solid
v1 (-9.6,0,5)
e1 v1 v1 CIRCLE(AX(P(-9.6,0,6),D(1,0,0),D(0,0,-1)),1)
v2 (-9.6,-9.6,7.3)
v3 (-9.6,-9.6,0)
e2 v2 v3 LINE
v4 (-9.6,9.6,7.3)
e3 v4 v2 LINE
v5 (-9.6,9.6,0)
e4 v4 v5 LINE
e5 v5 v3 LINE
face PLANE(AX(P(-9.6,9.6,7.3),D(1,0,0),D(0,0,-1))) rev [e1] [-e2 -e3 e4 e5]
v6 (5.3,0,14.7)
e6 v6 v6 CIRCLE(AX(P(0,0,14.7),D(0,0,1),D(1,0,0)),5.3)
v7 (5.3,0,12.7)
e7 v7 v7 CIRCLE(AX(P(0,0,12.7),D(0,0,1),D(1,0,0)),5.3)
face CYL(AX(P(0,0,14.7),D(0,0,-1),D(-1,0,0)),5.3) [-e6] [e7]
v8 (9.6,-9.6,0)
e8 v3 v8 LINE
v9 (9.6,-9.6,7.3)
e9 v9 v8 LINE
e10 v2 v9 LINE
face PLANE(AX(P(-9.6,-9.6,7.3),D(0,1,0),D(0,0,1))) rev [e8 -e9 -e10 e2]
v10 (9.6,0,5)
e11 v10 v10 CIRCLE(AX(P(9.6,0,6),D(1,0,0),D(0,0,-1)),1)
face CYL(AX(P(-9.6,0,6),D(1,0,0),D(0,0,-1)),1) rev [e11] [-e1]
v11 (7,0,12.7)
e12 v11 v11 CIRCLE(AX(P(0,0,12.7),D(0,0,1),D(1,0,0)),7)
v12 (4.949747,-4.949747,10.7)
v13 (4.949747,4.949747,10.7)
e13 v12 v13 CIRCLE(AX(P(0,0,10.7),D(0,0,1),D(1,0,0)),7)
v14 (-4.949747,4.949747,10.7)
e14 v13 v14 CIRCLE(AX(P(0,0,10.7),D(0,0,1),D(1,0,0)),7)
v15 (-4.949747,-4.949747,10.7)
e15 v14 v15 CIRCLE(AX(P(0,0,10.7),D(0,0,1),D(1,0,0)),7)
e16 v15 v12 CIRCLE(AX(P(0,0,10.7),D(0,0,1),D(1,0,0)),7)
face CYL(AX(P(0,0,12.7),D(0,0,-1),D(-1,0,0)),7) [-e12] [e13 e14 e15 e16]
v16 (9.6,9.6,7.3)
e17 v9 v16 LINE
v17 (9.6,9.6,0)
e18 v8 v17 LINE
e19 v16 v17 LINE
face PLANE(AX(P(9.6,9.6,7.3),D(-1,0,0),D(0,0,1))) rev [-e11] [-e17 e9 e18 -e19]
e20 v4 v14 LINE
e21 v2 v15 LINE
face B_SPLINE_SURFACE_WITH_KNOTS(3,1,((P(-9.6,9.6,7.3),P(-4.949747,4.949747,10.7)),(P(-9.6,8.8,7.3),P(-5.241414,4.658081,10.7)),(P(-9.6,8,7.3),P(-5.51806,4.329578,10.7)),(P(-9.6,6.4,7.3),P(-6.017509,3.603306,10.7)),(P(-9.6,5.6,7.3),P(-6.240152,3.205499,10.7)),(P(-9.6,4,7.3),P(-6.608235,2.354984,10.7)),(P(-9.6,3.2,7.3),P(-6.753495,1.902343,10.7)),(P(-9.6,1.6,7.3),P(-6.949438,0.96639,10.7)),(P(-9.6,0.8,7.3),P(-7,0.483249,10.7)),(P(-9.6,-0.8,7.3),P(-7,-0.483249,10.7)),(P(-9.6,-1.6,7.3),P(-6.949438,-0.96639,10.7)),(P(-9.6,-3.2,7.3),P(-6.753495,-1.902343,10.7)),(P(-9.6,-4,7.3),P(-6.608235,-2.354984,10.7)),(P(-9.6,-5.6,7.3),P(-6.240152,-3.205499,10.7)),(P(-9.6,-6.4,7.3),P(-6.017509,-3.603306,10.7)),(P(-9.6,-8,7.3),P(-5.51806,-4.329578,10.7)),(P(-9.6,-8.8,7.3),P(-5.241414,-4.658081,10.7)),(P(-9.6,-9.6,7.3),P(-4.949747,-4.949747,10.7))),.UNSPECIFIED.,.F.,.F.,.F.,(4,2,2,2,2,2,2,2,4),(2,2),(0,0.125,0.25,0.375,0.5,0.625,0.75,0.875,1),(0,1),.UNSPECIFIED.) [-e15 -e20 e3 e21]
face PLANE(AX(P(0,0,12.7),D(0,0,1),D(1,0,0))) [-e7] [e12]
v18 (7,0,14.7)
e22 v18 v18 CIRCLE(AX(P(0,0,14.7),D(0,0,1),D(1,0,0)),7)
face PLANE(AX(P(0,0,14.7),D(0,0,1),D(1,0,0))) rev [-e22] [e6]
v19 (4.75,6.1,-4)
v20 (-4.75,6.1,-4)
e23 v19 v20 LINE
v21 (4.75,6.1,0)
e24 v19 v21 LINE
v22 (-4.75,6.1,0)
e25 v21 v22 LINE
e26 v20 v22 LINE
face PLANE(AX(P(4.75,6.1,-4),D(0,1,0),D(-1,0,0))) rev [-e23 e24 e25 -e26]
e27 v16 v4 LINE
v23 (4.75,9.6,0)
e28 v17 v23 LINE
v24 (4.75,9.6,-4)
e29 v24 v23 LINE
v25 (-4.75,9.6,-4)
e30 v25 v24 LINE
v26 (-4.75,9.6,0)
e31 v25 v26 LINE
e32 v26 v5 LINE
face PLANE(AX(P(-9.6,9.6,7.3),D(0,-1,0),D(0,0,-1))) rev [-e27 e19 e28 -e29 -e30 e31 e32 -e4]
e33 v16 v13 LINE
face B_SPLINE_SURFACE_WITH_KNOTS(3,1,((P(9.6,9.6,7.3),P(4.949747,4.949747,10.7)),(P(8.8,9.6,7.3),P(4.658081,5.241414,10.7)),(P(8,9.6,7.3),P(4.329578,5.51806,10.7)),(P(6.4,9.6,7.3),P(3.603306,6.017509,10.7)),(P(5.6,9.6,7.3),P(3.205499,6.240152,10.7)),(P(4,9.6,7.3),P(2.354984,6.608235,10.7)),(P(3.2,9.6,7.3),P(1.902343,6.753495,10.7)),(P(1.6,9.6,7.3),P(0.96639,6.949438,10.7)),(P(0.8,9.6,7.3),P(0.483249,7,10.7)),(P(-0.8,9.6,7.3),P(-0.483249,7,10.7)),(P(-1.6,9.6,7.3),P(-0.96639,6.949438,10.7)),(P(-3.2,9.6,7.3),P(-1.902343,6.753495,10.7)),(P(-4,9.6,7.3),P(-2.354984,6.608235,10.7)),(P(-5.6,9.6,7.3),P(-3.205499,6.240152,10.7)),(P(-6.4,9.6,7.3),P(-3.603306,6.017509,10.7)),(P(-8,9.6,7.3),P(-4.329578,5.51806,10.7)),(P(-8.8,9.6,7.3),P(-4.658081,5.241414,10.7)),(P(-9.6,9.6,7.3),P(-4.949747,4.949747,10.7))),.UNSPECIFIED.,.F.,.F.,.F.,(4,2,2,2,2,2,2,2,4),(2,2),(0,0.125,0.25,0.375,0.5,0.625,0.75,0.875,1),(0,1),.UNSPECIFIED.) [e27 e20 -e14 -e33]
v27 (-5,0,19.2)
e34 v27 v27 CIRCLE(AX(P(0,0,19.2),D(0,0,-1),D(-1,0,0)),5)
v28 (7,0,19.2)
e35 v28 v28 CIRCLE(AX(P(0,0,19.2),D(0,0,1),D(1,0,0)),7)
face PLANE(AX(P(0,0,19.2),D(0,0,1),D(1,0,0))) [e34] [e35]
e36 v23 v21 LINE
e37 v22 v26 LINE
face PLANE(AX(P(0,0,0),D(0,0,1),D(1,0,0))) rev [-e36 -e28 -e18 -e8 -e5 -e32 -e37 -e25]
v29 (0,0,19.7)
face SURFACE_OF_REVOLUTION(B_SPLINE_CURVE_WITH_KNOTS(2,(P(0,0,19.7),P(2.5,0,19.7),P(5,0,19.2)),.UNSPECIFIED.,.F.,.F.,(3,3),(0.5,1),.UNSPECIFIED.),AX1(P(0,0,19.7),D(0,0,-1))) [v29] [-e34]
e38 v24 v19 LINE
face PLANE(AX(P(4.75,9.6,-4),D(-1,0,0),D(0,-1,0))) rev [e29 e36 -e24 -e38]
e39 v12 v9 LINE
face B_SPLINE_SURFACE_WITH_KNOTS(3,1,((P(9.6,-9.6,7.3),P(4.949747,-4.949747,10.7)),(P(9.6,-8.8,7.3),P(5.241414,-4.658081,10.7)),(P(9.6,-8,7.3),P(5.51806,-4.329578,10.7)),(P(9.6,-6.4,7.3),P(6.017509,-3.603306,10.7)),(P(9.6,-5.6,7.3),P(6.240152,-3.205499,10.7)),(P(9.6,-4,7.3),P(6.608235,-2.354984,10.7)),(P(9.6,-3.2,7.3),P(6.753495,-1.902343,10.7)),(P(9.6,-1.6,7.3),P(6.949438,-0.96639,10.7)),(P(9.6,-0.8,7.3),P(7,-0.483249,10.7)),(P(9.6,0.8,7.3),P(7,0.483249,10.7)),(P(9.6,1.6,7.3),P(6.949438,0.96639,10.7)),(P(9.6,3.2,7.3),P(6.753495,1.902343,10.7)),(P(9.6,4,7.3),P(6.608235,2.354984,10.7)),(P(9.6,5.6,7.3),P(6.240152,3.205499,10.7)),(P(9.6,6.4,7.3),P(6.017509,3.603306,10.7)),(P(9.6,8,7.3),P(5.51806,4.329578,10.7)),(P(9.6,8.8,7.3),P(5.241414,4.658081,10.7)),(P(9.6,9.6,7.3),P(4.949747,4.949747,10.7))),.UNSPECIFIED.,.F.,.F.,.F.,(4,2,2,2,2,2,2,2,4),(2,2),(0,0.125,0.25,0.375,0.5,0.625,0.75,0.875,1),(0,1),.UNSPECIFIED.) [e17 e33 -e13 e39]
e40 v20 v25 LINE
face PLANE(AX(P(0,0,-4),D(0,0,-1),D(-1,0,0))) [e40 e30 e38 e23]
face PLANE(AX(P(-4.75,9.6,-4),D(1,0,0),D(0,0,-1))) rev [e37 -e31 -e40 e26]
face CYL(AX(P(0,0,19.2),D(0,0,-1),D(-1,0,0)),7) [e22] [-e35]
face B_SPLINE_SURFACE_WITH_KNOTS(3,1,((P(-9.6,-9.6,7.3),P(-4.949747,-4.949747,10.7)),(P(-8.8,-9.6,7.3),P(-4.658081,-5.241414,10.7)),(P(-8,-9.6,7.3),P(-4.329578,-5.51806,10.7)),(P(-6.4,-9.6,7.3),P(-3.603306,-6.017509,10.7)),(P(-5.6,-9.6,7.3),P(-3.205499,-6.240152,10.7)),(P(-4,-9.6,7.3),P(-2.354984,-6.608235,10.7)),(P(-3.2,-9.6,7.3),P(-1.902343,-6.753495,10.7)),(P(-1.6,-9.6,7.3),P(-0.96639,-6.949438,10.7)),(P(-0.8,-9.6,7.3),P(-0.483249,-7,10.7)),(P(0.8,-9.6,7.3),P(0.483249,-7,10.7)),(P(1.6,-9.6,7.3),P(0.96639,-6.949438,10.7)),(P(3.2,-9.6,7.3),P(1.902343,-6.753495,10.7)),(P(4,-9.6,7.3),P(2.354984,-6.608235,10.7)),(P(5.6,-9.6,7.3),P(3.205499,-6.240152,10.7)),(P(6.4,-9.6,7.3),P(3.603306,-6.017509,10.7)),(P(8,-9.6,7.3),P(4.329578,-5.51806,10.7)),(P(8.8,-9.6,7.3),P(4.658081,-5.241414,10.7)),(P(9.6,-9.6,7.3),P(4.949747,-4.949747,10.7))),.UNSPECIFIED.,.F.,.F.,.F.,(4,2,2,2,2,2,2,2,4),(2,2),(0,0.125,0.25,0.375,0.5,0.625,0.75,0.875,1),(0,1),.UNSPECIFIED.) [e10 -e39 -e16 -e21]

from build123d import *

# Parameters (mm, degrees)
SKETCH1_W           = 19.2
SKETCH1_H           = 19.2
BOSS_EXTRUDE1_DEPTH = 7.3
BOSS_EXTRUDE2_DEPTH = 2
SKETCH4_R           = 5.3
BOSS_EXTRUDE3_DEPTH = 2
SKETCH5_R           = 7
BOSS_EXTRUDE4_DEPTH = 4.5
SKETCH7_R           = 1
CUT_EXTRUDE1_DEPTH  = 19.2
SKETCH8_W           = 9.5
SKETCH8_H           = 3.5
BOSS_EXTRUDE5_DEPTH = 4


with BuildPart() as part:
    # Sketch1 → Boss-Extrude1 (new body)
    with BuildSketch(Plane.XY):
        Rectangle(SKETCH1_W, SKETCH1_H)
    extrude(amount=BOSS_EXTRUDE1_DEPTH)

    # Loft1: read off the stored shape, not the designer's step
    # Loft1: loft between two sections, ruled curve by curve
    loft1_from = [
        Edge.make_bspline([(9.6, -9.6, 7.3), (9.6, -8.8, 7.3), (9.6, -8, 7.3), (9.6, -6.4, 7.3), (9.6, -5.6, 7.3), (9.6, -4, 7.3), (9.6, -3.2, 7.3), (9.6, -1.6, 7.3), (9.6, -0.8, 7.3), (9.6, 0.8, 7.3), (9.6, 1.6, 7.3), (9.6, 3.2, 7.3), (9.6, 4, 7.3), (9.6, 5.6, 7.3), (9.6, 6.4, 7.3), (9.6, 8, 7.3), (9.6, 8.8, 7.3), (9.6, 9.6, 7.3)], [0, 0, 0, 0, 0.125, 0.125, 0.25, 0.25, 0.375, 0.375, 0.5, 0.5, 0.625, 0.625, 0.75, 0.75, 0.875, 0.875, 1, 1, 1, 1], 3),
        Edge.make_bspline([(9.6, 9.6, 7.3), (8.8, 9.6, 7.3), (8, 9.6, 7.3), (6.4, 9.6, 7.3), (5.6, 9.6, 7.3), (4, 9.6, 7.3), (3.2, 9.6, 7.3), (1.6, 9.6, 7.3), (0.8, 9.6, 7.3), (-0.8, 9.6, 7.3), (-1.6, 9.6, 7.3), (-3.2, 9.6, 7.3), (-4, 9.6, 7.3), (-5.6, 9.6, 7.3), (-6.4, 9.6, 7.3), (-8, 9.6, 7.3), (-8.8, 9.6, 7.3), (-9.6, 9.6, 7.3)], [0, 0, 0, 0, 0.125, 0.125, 0.25, 0.25, 0.375, 0.375, 0.5, 0.5, 0.625, 0.625, 0.75, 0.75, 0.875, 0.875, 1, 1, 1, 1], 3),
        Edge.make_bspline([(-9.6, -9.6, 7.3), (-8.8, -9.6, 7.3), (-8, -9.6, 7.3), (-6.4, -9.6, 7.3), (-5.6, -9.6, 7.3), (-4, -9.6, 7.3), (-3.2, -9.6, 7.3), (-1.6, -9.6, 7.3), (-0.8, -9.6, 7.3), (0.8, -9.6, 7.3), (1.6, -9.6, 7.3), (3.2, -9.6, 7.3), (4, -9.6, 7.3), (5.6, -9.6, 7.3), (6.4, -9.6, 7.3), (8, -9.6, 7.3), (8.8, -9.6, 7.3), (9.6, -9.6, 7.3)], [0, 0, 0, 0, 0.125, 0.125, 0.25, 0.25, 0.375, 0.375, 0.5, 0.5, 0.625, 0.625, 0.75, 0.75, 0.875, 0.875, 1, 1, 1, 1], 3),
        Edge.make_bspline([(-9.6, 9.6, 7.3), (-9.6, 8.8, 7.3), (-9.6, 8, 7.3), (-9.6, 6.4, 7.3), (-9.6, 5.6, 7.3), (-9.6, 4, 7.3), (-9.6, 3.2, 7.3), (-9.6, 1.6, 7.3), (-9.6, 0.8, 7.3), (-9.6, -0.8, 7.3), (-9.6, -1.6, 7.3), (-9.6, -3.2, 7.3), (-9.6, -4, 7.3), (-9.6, -5.6, 7.3), (-9.6, -6.4, 7.3), (-9.6, -8, 7.3), (-9.6, -8.8, 7.3), (-9.6, -9.6, 7.3)], [0, 0, 0, 0, 0.125, 0.125, 0.25, 0.25, 0.375, 0.375, 0.5, 0.5, 0.625, 0.625, 0.75, 0.75, 0.875, 0.875, 1, 1, 1, 1], 3),
    ]
    loft1_to = [
        Edge.make_bspline([(4.949747468, -4.949747468, 10.7), (5.241414135, -4.658080802, 10.7), (5.518059607, -4.329578337, 10.7), (6.017509224, -3.603305863, 10.7), (6.24015166, -3.205498765, 10.7), (6.608234632, -2.3549841, 10.7), (6.753494754, -1.902343121, 10.7), (6.949438254, -0.966389521, 10.7), (7, -0.483249156, 10.7), (7, 0.483249156, 10.7), (6.949438254, 0.966389521, 10.7), (6.753494754, 1.902343121, 10.7), (6.608234632, 2.3549841, 10.7), (6.24015166, 3.205498765, 10.7), (6.017509224, 3.603305863, 10.7), (5.518059607, 4.329578337, 10.7), (5.241414135, 4.658080802, 10.7), (4.949747468, 4.949747468, 10.7)], [0, 0, 0, 0, 0.125, 0.125, 0.25, 0.25, 0.375, 0.375, 0.5, 0.5, 0.625, 0.625, 0.75, 0.75, 0.875, 0.875, 1, 1, 1, 1], 3),
        Edge.make_bspline([(4.949747468, 4.949747468, 10.7), (4.658080802, 5.241414135, 10.7), (4.329578337, 5.518059607, 10.7), (3.603305863, 6.017509224, 10.7), (3.205498765, 6.24015166, 10.7), (2.3549841, 6.608234632, 10.7), (1.902343121, 6.753494754, 10.7), (0.966389521, 6.949438254, 10.7), (0.483249156, 7, 10.7), (-0.483249156, 7, 10.7), (-0.966389521, 6.949438254, 10.7), (-1.902343121, 6.753494754, 10.7), (-2.3549841, 6.608234632, 10.7), (-3.205498765, 6.24015166, 10.7), (-3.603305863, 6.017509224, 10.7), (-4.329578337, 5.518059607, 10.7), (-4.658080802, 5.241414135, 10.7), (-4.949747468, 4.949747468, 10.7)], [0, 0, 0, 0, 0.125, 0.125, 0.25, 0.25, 0.375, 0.375, 0.5, 0.5, 0.625, 0.625, 0.75, 0.75, 0.875, 0.875, 1, 1, 1, 1], 3),
        Edge.make_bspline([(-4.949747468, -4.949747468, 10.7), (-4.658080802, -5.241414135, 10.7), (-4.329578337, -5.518059607, 10.7), (-3.603305863, -6.017509224, 10.7), (-3.205498765, -6.24015166, 10.7), (-2.3549841, -6.608234632, 10.7), (-1.902343121, -6.753494754, 10.7), (-0.966389521, -6.949438254, 10.7), (-0.483249156, -7, 10.7), (0.483249156, -7, 10.7), (0.966389521, -6.949438254, 10.7), (1.902343121, -6.753494754, 10.7), (2.3549841, -6.608234632, 10.7), (3.205498765, -6.24015166, 10.7), (3.603305863, -6.017509224, 10.7), (4.329578337, -5.518059607, 10.7), (4.658080802, -5.241414135, 10.7), (4.949747468, -4.949747468, 10.7)], [0, 0, 0, 0, 0.125, 0.125, 0.25, 0.25, 0.375, 0.375, 0.5, 0.5, 0.625, 0.625, 0.75, 0.75, 0.875, 0.875, 1, 1, 1, 1], 3),
        Edge.make_bspline([(-4.949747468, 4.949747468, 10.7), (-5.241414135, 4.658080802, 10.7), (-5.518059607, 4.329578337, 10.7), (-6.017509224, 3.603305863, 10.7), (-6.24015166, 3.205498765, 10.7), (-6.608234632, 2.3549841, 10.7), (-6.753494754, 1.902343121, 10.7), (-6.949438254, 0.966389521, 10.7), (-7, 0.483249156, 10.7), (-7, -0.483249156, 10.7), (-6.949438254, -0.966389521, 10.7), (-6.753494754, -1.902343121, 10.7), (-6.608234632, -2.3549841, 10.7), (-6.24015166, -3.205498765, 10.7), (-6.017509224, -3.603305863, 10.7), (-5.518059607, -4.329578337, 10.7), (-5.241414135, -4.658080802, 10.7), (-4.949747468, -4.949747468, 10.7)], [0, 0, 0, 0, 0.125, 0.125, 0.25, 0.25, 0.375, 0.375, 0.5, 0.5, 0.625, 0.625, 0.75, 0.75, 0.875, 0.875, 1, 1, 1, 1], 3),
    ]
    loft1 = Solid(Shell([*[Face.make_surface_from_curves(loft1_from[k], loft1_to[k]) for k in range(4)], Face(Wire(loft1_from)), Face(Wire(loft1_to))]))
    add(loft1)

    # Sketch3 → Boss-Extrude2 (add)
    with BuildSketch(Plane.XY.offset(10.7)):
        with BuildLine():
            ThreePointArc((-4.949747468, -4.949747468), (0, -7), (4.949747468, -4.949747468))
            ThreePointArc((4.949747468, -4.949747468), (7, 0), (4.949747468, 4.949747468))
            ThreePointArc((4.949747468, 4.949747468), (0, 7), (-4.949747468, 4.949747468))
            ThreePointArc((-4.949747468, 4.949747468), (-7, 0), (-4.949747468, -4.949747468))
        make_face()
    extrude(amount=BOSS_EXTRUDE2_DEPTH)

    # Sketch4 → Boss-Extrude3 (add)
    with BuildSketch(Plane.XY.offset(12.7)):
        Circle(SKETCH4_R)
    extrude(amount=BOSS_EXTRUDE3_DEPTH)

    # Sketch5 → Boss-Extrude4 (add)
    with BuildSketch(Plane.XY.offset(14.7)):
        with Locations(Location((0, 0, 0), (0, 0, 135))):
            Circle(SKETCH5_R)
    extrude(amount=BOSS_EXTRUDE4_DEPTH)

    # Sketch6 → Revolve3 (revolve)
    with BuildSketch(Plane(origin=(0, 0, 0), x_dir=(1, 0, 0), z_dir=(0, 1, 0))):
        with BuildLine():
            Line((0, -19.2), (5, -19.2))
            add(Edge.make_bspline(
                [(0, -19.7), (2.5, -19.7), (5, -19.2)],
                knots=[0.5, 0.5, 0.5, 1, 1, 1], degree=2))
            Line((0, -19.7), (0, -19.2))
        make_face()
    revolve(axis=Axis((0, 0, 19.7), (0, 0, 1)))

    # Sketch7 → Cut-Extrude1 (cut)
    with BuildSketch(Plane(origin=(9.6, 0, 0), x_dir=(0, 0, -1), z_dir=(1, 0, 0))):
        with Locations((-6, 0)):
            Circle(SKETCH7_R)
    extrude(amount=-CUT_EXTRUDE1_DEPTH, mode=Mode.SUBTRACT)

    # Sketch8 → Boss-Extrude5 (add)
    with BuildSketch(Plane(origin=(0, 0, 0), x_dir=(-1, 0, 0), z_dir=(0, 0, -1))):
        with Locations((0, 7.85)):
            Rectangle(SKETCH8_W, SKETCH8_H)
    extrude(amount=BOSS_EXTRUDE5_DEPTH)


solid = part.part
